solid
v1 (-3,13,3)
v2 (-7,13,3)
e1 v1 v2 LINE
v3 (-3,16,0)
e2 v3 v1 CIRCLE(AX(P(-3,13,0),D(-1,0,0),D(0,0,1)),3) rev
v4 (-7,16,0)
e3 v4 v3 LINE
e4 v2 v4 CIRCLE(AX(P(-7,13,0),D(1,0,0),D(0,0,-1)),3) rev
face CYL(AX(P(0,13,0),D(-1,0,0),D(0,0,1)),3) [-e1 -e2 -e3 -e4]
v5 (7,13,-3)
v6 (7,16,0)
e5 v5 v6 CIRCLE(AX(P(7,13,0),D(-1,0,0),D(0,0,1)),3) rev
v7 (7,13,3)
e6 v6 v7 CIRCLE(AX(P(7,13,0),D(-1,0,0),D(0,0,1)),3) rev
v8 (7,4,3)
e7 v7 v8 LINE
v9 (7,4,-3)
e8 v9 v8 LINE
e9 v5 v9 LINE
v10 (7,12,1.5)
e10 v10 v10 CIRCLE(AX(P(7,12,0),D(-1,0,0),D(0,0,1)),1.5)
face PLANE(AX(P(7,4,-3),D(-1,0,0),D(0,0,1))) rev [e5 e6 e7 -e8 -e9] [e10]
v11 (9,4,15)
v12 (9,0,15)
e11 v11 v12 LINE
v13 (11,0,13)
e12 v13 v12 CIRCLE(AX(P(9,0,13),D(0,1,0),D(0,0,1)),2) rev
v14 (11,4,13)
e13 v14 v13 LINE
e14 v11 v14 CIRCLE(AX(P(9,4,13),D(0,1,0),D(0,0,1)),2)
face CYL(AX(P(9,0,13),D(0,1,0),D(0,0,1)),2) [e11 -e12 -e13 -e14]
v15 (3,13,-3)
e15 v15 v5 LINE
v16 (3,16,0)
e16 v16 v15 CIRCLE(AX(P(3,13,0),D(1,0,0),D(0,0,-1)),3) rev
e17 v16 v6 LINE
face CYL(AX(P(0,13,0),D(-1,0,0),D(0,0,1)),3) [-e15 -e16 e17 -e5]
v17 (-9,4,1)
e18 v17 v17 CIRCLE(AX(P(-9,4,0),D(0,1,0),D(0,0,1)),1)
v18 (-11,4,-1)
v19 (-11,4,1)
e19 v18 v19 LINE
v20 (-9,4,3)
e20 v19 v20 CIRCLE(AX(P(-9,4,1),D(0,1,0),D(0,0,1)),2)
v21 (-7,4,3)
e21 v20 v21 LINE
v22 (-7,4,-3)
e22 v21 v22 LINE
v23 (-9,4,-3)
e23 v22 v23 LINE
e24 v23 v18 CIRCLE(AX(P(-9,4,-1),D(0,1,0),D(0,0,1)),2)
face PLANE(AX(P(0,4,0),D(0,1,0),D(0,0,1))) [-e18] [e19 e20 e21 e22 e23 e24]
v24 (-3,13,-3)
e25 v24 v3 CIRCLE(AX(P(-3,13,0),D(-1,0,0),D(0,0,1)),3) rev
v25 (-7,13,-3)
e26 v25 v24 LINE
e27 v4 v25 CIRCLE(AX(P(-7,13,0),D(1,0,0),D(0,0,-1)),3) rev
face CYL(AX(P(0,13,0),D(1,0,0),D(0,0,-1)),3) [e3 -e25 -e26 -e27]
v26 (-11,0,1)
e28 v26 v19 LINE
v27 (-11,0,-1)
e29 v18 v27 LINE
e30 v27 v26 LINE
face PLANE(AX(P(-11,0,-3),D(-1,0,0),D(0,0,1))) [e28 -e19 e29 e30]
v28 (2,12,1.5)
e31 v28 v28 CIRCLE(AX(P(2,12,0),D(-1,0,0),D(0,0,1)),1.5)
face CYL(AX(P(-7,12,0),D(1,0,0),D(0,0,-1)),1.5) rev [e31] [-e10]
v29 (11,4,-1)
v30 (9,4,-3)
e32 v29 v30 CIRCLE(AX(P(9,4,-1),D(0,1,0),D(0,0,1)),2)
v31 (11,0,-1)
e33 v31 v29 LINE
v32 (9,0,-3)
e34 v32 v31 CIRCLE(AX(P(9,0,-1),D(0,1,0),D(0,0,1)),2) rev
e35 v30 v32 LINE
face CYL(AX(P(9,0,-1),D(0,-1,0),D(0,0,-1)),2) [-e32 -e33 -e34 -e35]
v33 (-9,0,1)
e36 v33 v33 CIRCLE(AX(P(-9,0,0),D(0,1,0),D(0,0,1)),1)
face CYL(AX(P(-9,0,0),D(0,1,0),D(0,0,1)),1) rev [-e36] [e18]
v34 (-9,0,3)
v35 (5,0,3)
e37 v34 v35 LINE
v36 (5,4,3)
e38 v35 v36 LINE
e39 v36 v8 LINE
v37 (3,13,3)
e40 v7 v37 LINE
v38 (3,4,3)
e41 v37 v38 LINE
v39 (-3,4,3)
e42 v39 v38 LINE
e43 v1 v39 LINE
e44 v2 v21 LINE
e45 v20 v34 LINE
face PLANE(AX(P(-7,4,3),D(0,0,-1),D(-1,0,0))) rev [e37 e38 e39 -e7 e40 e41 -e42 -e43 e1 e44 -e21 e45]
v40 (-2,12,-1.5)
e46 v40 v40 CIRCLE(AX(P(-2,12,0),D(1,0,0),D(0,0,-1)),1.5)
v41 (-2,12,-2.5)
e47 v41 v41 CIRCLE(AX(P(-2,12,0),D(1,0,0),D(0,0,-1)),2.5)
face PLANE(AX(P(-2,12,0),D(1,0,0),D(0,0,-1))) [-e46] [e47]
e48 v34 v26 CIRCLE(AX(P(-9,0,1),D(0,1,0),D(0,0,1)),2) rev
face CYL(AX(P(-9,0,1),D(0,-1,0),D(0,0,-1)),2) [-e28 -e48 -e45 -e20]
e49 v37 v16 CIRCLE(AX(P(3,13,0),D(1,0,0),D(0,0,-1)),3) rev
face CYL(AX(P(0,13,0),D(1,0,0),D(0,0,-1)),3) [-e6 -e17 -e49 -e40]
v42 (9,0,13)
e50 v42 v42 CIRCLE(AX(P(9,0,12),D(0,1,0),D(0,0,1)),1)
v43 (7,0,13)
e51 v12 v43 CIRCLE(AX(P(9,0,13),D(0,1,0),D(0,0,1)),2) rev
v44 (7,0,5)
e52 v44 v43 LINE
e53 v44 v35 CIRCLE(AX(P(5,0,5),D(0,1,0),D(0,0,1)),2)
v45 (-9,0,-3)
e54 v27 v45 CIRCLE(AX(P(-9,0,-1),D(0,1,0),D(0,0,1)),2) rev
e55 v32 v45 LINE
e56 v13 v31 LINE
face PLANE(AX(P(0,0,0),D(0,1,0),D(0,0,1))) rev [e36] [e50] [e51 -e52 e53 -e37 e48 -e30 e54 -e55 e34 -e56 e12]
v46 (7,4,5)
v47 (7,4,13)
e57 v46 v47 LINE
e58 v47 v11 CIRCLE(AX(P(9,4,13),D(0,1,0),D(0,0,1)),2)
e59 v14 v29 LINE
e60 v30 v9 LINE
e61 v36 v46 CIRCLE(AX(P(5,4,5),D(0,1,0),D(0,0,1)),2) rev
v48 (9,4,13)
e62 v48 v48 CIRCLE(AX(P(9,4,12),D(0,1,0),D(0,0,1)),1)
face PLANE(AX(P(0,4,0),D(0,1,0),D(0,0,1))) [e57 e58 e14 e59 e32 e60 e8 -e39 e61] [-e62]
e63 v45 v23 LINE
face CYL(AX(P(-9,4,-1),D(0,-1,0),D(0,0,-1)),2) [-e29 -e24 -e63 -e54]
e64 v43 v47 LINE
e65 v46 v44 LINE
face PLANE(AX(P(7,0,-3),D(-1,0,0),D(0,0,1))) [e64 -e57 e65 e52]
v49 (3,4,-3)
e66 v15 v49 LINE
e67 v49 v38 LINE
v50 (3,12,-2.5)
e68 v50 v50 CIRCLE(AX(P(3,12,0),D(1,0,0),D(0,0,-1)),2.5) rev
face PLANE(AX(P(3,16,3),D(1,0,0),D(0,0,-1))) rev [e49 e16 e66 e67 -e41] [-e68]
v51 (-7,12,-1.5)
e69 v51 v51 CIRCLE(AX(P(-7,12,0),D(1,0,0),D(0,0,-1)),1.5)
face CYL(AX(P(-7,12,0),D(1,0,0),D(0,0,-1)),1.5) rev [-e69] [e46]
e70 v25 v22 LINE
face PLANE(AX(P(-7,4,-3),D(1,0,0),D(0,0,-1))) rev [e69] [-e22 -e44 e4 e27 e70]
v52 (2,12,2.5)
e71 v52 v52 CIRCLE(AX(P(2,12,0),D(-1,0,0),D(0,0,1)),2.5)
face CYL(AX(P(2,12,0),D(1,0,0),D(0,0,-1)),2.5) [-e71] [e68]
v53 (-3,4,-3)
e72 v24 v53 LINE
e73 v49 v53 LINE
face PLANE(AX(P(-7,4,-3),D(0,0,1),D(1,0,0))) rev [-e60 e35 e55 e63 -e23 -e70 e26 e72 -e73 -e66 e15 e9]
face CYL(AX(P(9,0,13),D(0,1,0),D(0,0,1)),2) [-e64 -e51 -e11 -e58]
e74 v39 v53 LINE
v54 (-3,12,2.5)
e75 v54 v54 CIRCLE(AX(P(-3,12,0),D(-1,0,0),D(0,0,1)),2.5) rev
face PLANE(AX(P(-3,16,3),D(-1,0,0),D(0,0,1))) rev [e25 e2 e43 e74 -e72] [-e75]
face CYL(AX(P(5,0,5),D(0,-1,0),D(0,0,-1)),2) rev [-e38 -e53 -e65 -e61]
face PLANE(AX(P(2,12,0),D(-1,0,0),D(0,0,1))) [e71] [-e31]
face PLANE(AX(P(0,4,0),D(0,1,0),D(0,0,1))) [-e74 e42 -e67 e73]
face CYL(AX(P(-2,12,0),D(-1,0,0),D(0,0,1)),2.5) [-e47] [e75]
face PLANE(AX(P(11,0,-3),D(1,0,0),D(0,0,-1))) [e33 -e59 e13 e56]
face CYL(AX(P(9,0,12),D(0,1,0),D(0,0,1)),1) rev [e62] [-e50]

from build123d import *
from build123d.topology import SkipClean

# Parameters (mm, degrees)
SKETCH2_W               = 14
SKETCH2_H               = 6
BOSS_EXTRUDE1_DEPTH     = 4
SKETCH3_W               = 4
SKETCH3_H               = 6
BOSS_EXTRUDE2_DEPTH     = 12
CUT_EXTRUDE1_DEPTH      = 22.470910554
CUT_EXTRUDE1_DEPTH_BACK = 22.470910554
SKETCH4_R               = 1.5
BOSS_EXTRUDE3_START     = 1
SKETCH5_R               = 2.5
SKETCH5_R_2             = 1.5
BOSS_EXTRUDE3_DEPTH     = 1
SKETCH6_R               = 2.5
SKETCH6_R_2             = 1.5
BOSS_EXTRUDE4_DEPTH     = 1
SKETCH7_R               = 1
SKETCH7_W               = 4
SKETCH7_H               = 6
BOSS_EXTRUDE5_DEPTH     = 4
FILLET1_R               = 2
FILLET2_R               = 3


with BuildPart() as part:
    # Sketch2 → Boss-Extrude1 (new body)
    with BuildSketch(Plane(origin=(0, 0, 0), x_dir=(1, 0, 0), z_dir=(0, 1, 0))):
        Rectangle(SKETCH2_W, SKETCH2_H)
    extrude(amount=BOSS_EXTRUDE1_DEPTH)

    # Sketch3 → Boss-Extrude2 (add)
    with BuildSketch(Plane(origin=(0, 4, 0), x_dir=(1, 0, 0), z_dir=(0, 1, 0))):
        with Locations((-5, 0)):
            Rectangle(SKETCH3_W, SKETCH3_H)
        with Locations((5, 0)):
            Rectangle(SKETCH3_W, SKETCH3_H)
    extrude(amount=BOSS_EXTRUDE2_DEPTH)

    # Sketch4 → Cut-Extrude1 (cut, two sides: drawn at the far end of the back side and taken through both)
    with BuildSketch(Plane(origin=(7, 0, 0), x_dir=(0, 0, -1), z_dir=(1, 0, 0)).offset(-CUT_EXTRUDE1_DEPTH_BACK)):
        with Locations((0, 12)):
            Circle(SKETCH4_R)
    extrude(amount=CUT_EXTRUDE1_DEPTH + CUT_EXTRUDE1_DEPTH_BACK, mode=Mode.SUBTRACT)

    # Sketch5 → Boss-Extrude3 (add)
    with BuildSketch(Plane(origin=(-3, 0, 0), x_dir=(0, 0, -1), z_dir=(1, 0, 0)).offset(BOSS_EXTRUDE3_START)):
        with Locations(Location((0, 12, 0), (0, 0, 180))):
            Circle(SKETCH5_R)
        with Locations((0, 12)):
            Circle(SKETCH5_R_2, mode=Mode.SUBTRACT)
    extrude(amount=-BOSS_EXTRUDE3_DEPTH)

    # Sketch6 → Boss-Extrude4 (add)
    with SkipClean():  # the faces are left unmerged after this step: merging them gives an invalid solid
        with BuildSketch(Plane.ZY.offset(-3)):
            with Locations((0, 12)):
                Circle(SKETCH6_R)
            with Locations((0, 12)):
                Circle(SKETCH6_R_2, mode=Mode.SUBTRACT)
        extrude(amount=BOSS_EXTRUDE4_DEPTH)

    # Sketch7 → Boss-Extrude5 (add)
    # profile 1 of 2: a face of its own
    with SkipClean():  # the faces are left unmerged after this step: merging them gives an invalid solid
        with BuildSketch(Plane(origin=(0, 4, 0), x_dir=(1, 0, 0), z_dir=(0, 1, 0))):
            Polygon((11, 3), (11, -3), (11, -11), (11, -15), (7, -15), (7, -11), (7, -3), (7, 3), align=None)
            with Locations(Location((9, -12, 0), (0, 0, 270))):
                Circle(SKETCH7_R, mode=Mode.SUBTRACT)
        # profile 2 of 2: a face of its own
        with BuildSketch(Plane(origin=(0, 4, 0), x_dir=(1, 0, 0), z_dir=(0, 1, 0))):
            with Locations((-9, 0)):
                Rectangle(SKETCH7_W, SKETCH7_H)
            with Locations(Location((-9, 0, 0), (0, 0, 270))):
                Circle(SKETCH7_R, mode=Mode.SUBTRACT)
        extrude(amount=-BOSS_EXTRUDE5_DEPTH)

    # Fillet1
    fillet1_edges = [part.edges().sort_by_distance(p)[0] for p in [
        (-11, 2, -3),
        (11, 2, -3),
        (-11, 2, 3),
        (7, 2, 3),
        (11, 2, 15),
        (7, 2, 15),
    ]]
    fillet(fillet1_edges, radius=FILLET1_R - 0.0001)  # a hair under: the kernel refuses the full size

    # Fillet2
    fillet2_edges = [part.edges().sort_by_distance(p)[0] for p in [
        (-5, 16, -3),
        (5, 16, -3),
        (5, 16, 3),
        (-5, 16, 3),
    ]]
    fillet(fillet2_edges, radius=FILLET2_R - 0.0001)  # a hair under: the kernel refuses the full size


solid = part.part
